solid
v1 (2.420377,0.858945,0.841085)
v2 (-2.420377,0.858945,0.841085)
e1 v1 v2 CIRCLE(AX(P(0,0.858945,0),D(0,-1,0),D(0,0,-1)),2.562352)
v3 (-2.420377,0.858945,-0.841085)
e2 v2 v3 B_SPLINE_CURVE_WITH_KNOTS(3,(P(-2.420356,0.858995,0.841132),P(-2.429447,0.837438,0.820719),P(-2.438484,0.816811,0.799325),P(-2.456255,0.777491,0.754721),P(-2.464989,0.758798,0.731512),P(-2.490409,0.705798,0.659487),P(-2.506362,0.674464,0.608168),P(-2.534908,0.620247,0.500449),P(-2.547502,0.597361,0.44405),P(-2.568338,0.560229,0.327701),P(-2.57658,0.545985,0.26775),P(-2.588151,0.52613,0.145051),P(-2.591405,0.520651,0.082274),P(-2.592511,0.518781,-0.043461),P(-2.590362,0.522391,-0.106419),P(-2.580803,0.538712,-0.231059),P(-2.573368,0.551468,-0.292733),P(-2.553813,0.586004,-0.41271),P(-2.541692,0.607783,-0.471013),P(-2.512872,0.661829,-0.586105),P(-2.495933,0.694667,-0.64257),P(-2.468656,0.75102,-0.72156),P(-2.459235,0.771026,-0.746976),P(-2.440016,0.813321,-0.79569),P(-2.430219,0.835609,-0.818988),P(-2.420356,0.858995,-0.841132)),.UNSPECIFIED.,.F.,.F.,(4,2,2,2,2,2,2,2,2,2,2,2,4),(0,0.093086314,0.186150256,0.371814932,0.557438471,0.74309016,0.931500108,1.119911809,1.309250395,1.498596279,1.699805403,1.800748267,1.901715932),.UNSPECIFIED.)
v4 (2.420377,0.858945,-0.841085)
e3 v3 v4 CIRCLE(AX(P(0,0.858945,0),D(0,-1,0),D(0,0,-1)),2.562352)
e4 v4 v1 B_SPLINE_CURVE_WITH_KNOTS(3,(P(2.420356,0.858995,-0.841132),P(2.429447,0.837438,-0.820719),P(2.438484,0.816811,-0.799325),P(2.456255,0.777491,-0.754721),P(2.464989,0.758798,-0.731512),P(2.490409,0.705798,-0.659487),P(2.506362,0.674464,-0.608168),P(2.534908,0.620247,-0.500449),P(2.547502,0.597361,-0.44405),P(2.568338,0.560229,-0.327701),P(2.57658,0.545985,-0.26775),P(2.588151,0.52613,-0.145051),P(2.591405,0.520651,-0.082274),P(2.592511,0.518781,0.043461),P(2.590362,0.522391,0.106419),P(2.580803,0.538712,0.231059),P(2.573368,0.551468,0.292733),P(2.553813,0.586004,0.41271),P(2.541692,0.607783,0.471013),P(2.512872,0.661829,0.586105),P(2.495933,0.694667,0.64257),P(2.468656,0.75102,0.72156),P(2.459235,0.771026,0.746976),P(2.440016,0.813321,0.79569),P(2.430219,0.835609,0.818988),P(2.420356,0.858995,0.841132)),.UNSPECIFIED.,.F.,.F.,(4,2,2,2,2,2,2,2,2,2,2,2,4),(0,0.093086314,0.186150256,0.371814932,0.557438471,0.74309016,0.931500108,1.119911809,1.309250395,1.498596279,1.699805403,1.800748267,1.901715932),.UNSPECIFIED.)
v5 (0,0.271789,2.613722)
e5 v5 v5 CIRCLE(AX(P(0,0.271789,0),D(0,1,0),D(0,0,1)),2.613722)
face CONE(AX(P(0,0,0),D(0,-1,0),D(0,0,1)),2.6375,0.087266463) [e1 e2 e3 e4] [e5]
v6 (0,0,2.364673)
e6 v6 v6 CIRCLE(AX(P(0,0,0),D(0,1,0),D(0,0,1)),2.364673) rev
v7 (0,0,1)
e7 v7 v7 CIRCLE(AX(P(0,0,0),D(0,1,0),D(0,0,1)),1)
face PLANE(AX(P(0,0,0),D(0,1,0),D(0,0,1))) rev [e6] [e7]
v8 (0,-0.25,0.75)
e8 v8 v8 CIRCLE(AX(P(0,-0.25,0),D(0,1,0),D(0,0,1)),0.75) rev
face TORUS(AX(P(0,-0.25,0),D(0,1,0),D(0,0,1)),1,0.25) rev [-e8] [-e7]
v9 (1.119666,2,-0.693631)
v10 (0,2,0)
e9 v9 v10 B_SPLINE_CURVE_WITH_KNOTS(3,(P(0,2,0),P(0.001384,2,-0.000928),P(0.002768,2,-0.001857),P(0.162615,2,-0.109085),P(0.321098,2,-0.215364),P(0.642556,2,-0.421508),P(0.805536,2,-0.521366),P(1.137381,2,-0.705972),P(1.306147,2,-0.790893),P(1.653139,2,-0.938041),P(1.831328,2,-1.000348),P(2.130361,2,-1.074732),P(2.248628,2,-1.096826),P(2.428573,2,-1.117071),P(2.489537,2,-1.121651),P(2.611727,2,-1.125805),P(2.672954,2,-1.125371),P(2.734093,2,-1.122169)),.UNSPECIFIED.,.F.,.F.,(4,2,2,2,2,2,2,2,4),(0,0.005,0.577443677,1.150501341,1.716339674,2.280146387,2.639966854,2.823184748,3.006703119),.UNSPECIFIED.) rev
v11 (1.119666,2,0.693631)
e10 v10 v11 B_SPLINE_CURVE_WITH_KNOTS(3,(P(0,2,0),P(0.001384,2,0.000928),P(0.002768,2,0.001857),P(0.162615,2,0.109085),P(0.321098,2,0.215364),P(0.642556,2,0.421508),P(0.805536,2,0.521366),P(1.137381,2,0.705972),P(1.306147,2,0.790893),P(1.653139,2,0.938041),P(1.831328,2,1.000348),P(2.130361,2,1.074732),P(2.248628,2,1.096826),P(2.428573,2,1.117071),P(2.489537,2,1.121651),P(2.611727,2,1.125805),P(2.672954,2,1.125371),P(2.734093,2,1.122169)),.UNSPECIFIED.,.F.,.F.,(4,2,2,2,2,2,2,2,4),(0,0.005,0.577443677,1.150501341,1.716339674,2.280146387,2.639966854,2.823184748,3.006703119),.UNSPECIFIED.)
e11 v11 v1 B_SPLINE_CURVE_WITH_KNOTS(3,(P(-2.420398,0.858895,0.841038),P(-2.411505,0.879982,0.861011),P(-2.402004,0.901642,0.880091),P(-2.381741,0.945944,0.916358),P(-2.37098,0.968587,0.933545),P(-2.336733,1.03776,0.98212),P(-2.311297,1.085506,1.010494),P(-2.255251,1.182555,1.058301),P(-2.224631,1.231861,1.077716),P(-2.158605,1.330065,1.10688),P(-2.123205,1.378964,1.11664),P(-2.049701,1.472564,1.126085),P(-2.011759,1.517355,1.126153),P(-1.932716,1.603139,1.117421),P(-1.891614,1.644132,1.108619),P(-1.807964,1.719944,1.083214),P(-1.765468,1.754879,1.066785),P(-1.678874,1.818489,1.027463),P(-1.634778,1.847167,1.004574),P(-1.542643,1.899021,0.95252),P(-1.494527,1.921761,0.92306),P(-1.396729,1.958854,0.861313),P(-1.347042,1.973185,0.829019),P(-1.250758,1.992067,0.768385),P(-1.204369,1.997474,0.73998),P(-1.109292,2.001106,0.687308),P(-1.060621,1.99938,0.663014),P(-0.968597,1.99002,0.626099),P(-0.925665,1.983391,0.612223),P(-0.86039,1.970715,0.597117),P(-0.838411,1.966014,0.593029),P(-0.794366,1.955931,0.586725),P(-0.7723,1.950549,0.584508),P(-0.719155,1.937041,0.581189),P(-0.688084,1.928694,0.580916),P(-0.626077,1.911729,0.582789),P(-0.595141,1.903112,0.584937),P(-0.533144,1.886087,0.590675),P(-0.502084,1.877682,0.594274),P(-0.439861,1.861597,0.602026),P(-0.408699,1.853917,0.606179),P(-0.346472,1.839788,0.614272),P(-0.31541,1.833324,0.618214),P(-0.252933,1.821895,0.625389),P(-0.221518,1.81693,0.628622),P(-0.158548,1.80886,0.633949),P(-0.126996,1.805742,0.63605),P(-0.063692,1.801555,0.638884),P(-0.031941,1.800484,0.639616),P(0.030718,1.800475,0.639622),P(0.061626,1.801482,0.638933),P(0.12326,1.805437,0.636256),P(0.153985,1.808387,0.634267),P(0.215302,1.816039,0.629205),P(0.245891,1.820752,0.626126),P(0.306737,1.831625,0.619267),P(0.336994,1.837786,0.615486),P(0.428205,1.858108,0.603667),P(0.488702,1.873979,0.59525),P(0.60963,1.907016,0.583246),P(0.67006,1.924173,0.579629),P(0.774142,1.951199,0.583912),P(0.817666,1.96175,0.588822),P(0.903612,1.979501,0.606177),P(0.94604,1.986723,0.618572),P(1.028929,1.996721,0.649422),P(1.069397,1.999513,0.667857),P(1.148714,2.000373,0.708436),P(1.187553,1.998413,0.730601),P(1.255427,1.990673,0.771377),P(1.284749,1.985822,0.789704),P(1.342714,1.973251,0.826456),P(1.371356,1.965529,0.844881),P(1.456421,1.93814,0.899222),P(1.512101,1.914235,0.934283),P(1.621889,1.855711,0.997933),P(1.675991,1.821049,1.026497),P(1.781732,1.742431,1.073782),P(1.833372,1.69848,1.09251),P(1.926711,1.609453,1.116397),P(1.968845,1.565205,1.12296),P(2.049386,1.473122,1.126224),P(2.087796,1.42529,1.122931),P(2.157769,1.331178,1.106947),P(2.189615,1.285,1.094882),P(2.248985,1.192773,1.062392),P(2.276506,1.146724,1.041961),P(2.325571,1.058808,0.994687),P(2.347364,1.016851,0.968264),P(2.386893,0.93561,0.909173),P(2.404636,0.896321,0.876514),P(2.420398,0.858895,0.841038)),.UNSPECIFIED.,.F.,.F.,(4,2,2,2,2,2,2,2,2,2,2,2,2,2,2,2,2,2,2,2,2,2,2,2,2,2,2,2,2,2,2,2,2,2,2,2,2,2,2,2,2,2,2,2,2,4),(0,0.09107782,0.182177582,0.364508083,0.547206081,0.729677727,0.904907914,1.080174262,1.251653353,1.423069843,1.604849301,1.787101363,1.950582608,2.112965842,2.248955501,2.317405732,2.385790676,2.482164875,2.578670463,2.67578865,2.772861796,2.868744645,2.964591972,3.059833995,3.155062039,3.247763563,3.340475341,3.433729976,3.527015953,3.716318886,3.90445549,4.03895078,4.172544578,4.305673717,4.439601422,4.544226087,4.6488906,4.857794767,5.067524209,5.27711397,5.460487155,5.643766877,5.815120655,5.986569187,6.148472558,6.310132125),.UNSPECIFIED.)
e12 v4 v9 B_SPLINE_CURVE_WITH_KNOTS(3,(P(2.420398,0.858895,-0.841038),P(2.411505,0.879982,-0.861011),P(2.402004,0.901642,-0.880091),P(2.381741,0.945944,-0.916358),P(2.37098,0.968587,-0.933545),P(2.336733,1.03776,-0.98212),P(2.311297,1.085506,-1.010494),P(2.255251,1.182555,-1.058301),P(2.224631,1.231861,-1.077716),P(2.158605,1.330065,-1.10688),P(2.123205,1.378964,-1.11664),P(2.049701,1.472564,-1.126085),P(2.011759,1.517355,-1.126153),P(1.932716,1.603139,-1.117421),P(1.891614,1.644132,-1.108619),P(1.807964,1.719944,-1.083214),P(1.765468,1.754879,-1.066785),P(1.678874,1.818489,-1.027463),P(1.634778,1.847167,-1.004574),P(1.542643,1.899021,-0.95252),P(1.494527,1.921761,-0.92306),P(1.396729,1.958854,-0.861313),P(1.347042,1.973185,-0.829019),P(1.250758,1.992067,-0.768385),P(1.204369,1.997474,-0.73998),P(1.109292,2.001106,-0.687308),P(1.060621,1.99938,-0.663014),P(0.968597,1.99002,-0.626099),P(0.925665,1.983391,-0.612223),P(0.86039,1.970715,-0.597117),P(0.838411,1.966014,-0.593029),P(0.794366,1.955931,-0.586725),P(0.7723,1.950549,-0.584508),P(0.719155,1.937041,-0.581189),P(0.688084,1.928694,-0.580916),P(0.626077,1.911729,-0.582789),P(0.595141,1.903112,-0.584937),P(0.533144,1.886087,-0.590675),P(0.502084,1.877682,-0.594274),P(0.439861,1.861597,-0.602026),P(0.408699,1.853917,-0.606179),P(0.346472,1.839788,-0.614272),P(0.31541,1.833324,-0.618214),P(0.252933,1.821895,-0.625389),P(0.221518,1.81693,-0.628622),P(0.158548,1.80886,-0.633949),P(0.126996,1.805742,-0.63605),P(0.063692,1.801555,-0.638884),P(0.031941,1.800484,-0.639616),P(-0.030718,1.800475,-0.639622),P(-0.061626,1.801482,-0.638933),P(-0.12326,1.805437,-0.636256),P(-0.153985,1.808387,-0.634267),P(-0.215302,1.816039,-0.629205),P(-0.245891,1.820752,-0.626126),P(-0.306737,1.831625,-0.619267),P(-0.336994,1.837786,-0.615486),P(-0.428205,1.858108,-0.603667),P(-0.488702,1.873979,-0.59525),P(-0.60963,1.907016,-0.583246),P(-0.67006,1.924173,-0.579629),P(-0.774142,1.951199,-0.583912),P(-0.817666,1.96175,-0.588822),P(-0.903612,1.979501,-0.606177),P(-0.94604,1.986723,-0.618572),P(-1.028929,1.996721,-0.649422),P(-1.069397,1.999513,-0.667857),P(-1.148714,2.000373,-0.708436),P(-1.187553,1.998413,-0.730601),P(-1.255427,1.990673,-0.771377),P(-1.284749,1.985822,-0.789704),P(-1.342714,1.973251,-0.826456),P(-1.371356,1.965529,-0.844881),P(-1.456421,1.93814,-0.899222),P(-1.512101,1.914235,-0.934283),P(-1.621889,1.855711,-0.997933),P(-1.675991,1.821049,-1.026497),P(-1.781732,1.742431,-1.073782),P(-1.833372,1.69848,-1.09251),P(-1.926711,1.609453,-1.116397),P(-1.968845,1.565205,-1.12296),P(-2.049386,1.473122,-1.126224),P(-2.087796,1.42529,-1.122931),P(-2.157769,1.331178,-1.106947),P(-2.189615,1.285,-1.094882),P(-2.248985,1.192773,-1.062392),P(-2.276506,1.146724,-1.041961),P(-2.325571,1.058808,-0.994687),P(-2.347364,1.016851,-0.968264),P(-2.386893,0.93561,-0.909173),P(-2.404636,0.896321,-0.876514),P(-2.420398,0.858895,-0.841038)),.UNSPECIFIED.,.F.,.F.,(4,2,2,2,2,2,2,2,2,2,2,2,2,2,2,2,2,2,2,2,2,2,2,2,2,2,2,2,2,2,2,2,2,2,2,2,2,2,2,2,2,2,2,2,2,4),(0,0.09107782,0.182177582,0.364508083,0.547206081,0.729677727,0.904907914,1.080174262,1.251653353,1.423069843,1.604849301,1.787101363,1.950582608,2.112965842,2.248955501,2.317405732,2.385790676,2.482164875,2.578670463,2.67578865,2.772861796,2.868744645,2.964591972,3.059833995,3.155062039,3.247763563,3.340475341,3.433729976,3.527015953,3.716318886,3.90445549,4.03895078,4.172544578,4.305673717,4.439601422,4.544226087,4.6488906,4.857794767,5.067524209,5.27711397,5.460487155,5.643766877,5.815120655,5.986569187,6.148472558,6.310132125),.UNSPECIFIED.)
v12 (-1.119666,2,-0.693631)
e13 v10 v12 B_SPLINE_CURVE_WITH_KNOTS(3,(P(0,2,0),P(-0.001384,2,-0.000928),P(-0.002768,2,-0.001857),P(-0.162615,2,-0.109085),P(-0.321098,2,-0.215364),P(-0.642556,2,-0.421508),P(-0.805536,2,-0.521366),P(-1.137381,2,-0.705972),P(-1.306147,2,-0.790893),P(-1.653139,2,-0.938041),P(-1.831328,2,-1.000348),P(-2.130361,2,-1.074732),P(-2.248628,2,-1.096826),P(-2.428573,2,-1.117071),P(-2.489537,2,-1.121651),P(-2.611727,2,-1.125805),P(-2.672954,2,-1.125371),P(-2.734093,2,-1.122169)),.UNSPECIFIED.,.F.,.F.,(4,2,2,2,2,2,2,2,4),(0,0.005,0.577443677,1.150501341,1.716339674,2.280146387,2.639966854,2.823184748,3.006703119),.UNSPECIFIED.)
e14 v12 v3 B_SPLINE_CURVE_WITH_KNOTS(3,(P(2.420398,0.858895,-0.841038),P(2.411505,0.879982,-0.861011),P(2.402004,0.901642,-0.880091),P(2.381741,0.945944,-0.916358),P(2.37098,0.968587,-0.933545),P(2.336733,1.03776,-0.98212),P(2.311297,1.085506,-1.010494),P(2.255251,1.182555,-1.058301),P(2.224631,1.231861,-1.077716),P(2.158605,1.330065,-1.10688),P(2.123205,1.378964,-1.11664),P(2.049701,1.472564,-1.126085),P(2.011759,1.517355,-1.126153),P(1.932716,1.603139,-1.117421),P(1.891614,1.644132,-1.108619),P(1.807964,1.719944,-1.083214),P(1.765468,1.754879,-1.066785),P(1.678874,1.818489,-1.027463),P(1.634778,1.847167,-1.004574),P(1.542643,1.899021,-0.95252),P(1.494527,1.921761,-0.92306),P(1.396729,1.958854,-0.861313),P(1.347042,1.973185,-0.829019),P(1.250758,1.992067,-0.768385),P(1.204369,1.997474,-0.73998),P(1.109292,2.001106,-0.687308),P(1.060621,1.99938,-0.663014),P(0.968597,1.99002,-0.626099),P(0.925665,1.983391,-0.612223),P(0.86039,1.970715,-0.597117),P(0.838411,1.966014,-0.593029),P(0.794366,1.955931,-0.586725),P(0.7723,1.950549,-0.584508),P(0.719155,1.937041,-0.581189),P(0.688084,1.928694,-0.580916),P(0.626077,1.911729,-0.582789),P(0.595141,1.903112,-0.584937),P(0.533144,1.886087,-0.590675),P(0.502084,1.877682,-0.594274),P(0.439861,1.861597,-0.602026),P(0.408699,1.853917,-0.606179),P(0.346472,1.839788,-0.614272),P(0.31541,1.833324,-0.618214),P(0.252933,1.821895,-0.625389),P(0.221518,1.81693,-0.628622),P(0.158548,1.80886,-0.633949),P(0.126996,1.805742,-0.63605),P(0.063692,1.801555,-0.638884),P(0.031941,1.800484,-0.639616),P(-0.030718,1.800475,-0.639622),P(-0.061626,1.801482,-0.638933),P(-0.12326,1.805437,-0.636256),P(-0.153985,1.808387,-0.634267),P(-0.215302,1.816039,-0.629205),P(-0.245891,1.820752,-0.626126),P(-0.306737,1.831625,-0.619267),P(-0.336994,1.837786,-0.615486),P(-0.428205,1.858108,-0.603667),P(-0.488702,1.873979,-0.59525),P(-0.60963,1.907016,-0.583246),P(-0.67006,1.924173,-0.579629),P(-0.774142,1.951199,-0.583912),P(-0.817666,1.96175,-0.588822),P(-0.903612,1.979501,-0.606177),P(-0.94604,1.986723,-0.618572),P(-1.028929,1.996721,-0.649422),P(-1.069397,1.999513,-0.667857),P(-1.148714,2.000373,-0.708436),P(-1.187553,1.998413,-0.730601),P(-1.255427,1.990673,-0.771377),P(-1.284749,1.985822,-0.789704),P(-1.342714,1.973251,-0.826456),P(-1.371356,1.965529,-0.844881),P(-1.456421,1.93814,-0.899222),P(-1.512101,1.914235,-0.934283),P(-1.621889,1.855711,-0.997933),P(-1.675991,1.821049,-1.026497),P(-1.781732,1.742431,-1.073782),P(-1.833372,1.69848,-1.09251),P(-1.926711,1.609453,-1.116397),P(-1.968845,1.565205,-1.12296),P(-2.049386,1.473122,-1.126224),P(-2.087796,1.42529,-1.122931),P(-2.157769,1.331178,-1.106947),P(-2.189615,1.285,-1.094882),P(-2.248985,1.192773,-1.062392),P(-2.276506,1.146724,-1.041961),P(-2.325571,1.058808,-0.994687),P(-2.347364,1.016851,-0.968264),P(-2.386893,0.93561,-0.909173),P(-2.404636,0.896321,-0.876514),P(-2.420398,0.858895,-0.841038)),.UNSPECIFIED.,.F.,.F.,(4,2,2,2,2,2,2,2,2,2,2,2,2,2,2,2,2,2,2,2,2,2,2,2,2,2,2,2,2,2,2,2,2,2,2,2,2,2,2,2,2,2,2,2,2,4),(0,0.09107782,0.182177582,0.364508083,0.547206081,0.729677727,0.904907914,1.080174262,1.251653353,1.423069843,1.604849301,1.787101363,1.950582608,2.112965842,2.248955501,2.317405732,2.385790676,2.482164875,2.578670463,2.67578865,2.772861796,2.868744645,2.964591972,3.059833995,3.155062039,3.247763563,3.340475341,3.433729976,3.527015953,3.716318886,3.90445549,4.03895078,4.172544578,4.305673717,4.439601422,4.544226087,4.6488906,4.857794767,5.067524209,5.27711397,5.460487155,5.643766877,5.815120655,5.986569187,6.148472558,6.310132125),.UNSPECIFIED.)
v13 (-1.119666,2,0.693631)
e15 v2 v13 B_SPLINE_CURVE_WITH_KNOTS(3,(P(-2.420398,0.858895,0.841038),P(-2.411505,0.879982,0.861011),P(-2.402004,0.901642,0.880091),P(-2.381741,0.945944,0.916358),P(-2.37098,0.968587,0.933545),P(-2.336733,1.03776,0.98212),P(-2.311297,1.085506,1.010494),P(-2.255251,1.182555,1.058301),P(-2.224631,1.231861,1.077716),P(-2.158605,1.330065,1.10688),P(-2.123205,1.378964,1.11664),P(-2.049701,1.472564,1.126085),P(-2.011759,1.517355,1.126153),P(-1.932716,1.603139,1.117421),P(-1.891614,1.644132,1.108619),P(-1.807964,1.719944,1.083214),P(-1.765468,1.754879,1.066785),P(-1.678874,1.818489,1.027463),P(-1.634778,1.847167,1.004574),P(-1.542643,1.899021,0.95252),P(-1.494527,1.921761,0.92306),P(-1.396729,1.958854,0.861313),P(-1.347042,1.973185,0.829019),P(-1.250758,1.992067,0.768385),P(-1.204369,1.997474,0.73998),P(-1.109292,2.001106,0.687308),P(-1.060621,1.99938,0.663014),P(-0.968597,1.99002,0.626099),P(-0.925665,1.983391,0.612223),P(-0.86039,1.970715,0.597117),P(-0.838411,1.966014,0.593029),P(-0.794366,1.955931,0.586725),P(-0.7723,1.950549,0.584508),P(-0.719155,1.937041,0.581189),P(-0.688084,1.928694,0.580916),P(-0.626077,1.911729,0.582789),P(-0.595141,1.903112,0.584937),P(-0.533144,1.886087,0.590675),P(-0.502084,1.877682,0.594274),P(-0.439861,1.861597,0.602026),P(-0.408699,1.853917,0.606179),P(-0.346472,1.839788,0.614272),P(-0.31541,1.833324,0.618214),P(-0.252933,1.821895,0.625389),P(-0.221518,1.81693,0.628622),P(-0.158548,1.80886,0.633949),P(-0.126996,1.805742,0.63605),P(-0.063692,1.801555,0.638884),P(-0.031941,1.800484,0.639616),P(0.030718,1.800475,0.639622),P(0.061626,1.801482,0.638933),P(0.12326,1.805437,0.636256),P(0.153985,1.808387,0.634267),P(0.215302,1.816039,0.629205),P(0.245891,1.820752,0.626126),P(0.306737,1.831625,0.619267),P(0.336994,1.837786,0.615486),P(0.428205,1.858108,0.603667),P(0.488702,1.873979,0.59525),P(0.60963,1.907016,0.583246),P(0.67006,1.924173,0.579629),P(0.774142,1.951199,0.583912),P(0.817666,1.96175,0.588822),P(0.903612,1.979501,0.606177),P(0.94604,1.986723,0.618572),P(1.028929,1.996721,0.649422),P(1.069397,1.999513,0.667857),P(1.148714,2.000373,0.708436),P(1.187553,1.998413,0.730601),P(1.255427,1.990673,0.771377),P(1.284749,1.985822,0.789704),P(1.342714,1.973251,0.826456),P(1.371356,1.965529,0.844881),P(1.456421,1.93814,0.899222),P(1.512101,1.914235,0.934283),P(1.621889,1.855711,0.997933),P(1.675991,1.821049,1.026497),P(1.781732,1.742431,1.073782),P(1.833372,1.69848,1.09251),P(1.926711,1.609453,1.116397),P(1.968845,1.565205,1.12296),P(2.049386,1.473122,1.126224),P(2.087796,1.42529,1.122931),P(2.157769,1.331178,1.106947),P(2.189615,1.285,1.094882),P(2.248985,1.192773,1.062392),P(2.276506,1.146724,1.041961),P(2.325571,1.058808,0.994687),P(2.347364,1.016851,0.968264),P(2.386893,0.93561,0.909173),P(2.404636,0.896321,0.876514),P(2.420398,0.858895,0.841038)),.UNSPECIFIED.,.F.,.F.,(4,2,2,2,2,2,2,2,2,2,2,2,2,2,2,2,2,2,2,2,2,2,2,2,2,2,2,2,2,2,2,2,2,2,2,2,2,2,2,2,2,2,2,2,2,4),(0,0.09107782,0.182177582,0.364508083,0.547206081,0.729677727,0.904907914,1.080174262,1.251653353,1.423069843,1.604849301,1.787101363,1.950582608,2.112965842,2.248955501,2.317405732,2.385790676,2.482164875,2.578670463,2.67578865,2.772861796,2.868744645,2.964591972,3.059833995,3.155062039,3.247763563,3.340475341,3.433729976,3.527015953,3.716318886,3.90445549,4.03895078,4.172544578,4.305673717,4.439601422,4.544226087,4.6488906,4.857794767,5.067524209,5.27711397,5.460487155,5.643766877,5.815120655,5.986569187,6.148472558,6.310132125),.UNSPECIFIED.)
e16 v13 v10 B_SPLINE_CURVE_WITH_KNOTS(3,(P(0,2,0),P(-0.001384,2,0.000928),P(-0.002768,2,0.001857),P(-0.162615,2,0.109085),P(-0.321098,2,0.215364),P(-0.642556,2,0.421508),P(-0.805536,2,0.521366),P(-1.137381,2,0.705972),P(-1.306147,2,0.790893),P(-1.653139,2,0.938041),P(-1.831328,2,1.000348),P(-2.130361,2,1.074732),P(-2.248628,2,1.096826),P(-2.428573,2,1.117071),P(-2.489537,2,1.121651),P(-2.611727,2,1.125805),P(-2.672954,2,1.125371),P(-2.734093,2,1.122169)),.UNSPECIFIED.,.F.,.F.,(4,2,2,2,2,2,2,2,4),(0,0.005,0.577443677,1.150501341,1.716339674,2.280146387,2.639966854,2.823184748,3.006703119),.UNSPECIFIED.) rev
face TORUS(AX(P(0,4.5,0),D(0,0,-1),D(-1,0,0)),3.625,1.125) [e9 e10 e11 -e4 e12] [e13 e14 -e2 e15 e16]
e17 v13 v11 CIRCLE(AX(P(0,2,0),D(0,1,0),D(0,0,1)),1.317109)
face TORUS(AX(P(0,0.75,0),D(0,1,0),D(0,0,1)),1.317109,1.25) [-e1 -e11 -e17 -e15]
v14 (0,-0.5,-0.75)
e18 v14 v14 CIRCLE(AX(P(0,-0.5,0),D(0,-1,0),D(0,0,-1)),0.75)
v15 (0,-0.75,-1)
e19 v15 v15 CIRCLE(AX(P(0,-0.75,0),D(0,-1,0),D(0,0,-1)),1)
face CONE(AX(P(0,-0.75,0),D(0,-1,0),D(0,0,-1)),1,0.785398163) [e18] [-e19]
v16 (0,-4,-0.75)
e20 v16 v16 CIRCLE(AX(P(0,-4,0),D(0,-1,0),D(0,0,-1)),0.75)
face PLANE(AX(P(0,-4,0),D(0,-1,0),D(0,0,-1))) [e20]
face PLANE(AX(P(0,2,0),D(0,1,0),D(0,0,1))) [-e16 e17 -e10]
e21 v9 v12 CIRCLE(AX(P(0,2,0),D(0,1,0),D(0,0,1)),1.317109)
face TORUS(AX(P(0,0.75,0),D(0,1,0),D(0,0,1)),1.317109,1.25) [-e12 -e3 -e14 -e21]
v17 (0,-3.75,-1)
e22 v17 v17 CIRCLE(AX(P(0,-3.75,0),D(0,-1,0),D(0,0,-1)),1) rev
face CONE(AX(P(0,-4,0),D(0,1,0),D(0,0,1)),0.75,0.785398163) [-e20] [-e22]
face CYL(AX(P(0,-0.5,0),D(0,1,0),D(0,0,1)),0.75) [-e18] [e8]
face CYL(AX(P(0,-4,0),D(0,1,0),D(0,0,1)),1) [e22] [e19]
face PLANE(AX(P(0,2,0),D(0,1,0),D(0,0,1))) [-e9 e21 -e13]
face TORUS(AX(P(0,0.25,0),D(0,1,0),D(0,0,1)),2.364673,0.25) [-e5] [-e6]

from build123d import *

# Parameters (mm, degrees)
SKETCH_1_R               = 10.55
EXTRUDE_1_DEPTH          = 8
EXTRUDE_1_TAPER          = 5
FILLET_1_R               = 5
SKETCH_3_R               = 4.5
CUT_EXTRUDE_1_DEPTH      = 8
CUT_EXTRUDE_1_DEPTH_BACK = 8
SKETCH_5_R               = 3
EXTRUDE_2_DEPTH          = 2
SKETCH_6_R               = 4
EXTRUDE_3_DEPTH          = 14
FILLET_2_R               = 1
CHAMFER_1_SIZE           = 1
SCALE_1_SCALE            = 0.25


with BuildPart() as part:
    # 草图1 → 拉伸1 (new body)
    with BuildSketch(Plane(origin=(0, 0, 0), x_dir=(1, 0, 0), z_dir=(0, 1, 0))):
        Circle(SKETCH_1_R)
    extrude(amount=EXTRUDE_1_DEPTH, taper=EXTRUDE_1_TAPER)

    # 圆角1
    fillet_1_edges = [part.edges().sort_by_distance(p)[0] for p in [
        (-9.850090692, 8, 0),
    ]]
    fillet(fillet_1_edges, radius=FILLET_1_R)

    # 扫描1: sweep along a path in 草图2
    with BuildLine(Plane.XY) as sweep_1_path:
        CenterArc((0, 18), 14.5, 0, 360)
    # 草图3 → 扫描1 (sweep)
    with BuildSketch(Plane(origin=(0, 0, 0), x_dir=(0, 0, -1), z_dir=(1, 0, 0))):
        with Locations((0, 32.5)):
            Circle(SKETCH_3_R)
    sweep(path=sweep_1_path.line)

    # 草图4 → 切除-拉伸1 (cut, two sides: drawn at the far end of the back side and taken through both)
    with BuildSketch(Plane.XY.offset(-CUT_EXTRUDE_1_DEPTH_BACK)):
        Polygon((0, 0), (10.55, 0), (10.55, -2.402486402), (-10.55, -2.402486402), (-10.55, 0), align=None)
    extrude(amount=CUT_EXTRUDE_1_DEPTH + CUT_EXTRUDE_1_DEPTH_BACK, mode=Mode.SUBTRACT)

    # 草图5 → 拉伸2 (add)
    with BuildSketch(Plane.XZ):
        with Locations(Location((0, 0, 0), (0, 0, 90))):
            Circle(SKETCH_5_R)
    extrude(amount=EXTRUDE_2_DEPTH)

    # 草图6 → 拉伸3 (add)
    with BuildSketch(Plane.XZ.offset(2)):
        with Locations(Location((0, 0, 0), (0, 0, 270))):
            Circle(SKETCH_6_R)
    extrude(amount=EXTRUDE_3_DEPTH)

    # 圆角2
    fillet_2_edges = [part.edges().sort_by_distance(p)[0] for p in [
        (-10.55, 0, 0),
        (0, 0, -3),
    ]]
    fillet(fillet_2_edges, radius=FILLET_2_R)

    # 倒角1
    chamfer_1_edges = [part.edges().sort_by_distance(p)[0] for p in [
        (0, -2, 4),
        (0, -16, 4),
    ]]
    chamfer(chamfer_1_edges, length=CHAMFER_1_SIZE - 0.0001)  # a hair under: the kernel refuses the full size


with BuildPart() as part_1:
    # 缩放比例1: scaled about (0, 0, 0)
    add(part.part.scale(SCALE_1_SCALE))


solid = part_1.part
